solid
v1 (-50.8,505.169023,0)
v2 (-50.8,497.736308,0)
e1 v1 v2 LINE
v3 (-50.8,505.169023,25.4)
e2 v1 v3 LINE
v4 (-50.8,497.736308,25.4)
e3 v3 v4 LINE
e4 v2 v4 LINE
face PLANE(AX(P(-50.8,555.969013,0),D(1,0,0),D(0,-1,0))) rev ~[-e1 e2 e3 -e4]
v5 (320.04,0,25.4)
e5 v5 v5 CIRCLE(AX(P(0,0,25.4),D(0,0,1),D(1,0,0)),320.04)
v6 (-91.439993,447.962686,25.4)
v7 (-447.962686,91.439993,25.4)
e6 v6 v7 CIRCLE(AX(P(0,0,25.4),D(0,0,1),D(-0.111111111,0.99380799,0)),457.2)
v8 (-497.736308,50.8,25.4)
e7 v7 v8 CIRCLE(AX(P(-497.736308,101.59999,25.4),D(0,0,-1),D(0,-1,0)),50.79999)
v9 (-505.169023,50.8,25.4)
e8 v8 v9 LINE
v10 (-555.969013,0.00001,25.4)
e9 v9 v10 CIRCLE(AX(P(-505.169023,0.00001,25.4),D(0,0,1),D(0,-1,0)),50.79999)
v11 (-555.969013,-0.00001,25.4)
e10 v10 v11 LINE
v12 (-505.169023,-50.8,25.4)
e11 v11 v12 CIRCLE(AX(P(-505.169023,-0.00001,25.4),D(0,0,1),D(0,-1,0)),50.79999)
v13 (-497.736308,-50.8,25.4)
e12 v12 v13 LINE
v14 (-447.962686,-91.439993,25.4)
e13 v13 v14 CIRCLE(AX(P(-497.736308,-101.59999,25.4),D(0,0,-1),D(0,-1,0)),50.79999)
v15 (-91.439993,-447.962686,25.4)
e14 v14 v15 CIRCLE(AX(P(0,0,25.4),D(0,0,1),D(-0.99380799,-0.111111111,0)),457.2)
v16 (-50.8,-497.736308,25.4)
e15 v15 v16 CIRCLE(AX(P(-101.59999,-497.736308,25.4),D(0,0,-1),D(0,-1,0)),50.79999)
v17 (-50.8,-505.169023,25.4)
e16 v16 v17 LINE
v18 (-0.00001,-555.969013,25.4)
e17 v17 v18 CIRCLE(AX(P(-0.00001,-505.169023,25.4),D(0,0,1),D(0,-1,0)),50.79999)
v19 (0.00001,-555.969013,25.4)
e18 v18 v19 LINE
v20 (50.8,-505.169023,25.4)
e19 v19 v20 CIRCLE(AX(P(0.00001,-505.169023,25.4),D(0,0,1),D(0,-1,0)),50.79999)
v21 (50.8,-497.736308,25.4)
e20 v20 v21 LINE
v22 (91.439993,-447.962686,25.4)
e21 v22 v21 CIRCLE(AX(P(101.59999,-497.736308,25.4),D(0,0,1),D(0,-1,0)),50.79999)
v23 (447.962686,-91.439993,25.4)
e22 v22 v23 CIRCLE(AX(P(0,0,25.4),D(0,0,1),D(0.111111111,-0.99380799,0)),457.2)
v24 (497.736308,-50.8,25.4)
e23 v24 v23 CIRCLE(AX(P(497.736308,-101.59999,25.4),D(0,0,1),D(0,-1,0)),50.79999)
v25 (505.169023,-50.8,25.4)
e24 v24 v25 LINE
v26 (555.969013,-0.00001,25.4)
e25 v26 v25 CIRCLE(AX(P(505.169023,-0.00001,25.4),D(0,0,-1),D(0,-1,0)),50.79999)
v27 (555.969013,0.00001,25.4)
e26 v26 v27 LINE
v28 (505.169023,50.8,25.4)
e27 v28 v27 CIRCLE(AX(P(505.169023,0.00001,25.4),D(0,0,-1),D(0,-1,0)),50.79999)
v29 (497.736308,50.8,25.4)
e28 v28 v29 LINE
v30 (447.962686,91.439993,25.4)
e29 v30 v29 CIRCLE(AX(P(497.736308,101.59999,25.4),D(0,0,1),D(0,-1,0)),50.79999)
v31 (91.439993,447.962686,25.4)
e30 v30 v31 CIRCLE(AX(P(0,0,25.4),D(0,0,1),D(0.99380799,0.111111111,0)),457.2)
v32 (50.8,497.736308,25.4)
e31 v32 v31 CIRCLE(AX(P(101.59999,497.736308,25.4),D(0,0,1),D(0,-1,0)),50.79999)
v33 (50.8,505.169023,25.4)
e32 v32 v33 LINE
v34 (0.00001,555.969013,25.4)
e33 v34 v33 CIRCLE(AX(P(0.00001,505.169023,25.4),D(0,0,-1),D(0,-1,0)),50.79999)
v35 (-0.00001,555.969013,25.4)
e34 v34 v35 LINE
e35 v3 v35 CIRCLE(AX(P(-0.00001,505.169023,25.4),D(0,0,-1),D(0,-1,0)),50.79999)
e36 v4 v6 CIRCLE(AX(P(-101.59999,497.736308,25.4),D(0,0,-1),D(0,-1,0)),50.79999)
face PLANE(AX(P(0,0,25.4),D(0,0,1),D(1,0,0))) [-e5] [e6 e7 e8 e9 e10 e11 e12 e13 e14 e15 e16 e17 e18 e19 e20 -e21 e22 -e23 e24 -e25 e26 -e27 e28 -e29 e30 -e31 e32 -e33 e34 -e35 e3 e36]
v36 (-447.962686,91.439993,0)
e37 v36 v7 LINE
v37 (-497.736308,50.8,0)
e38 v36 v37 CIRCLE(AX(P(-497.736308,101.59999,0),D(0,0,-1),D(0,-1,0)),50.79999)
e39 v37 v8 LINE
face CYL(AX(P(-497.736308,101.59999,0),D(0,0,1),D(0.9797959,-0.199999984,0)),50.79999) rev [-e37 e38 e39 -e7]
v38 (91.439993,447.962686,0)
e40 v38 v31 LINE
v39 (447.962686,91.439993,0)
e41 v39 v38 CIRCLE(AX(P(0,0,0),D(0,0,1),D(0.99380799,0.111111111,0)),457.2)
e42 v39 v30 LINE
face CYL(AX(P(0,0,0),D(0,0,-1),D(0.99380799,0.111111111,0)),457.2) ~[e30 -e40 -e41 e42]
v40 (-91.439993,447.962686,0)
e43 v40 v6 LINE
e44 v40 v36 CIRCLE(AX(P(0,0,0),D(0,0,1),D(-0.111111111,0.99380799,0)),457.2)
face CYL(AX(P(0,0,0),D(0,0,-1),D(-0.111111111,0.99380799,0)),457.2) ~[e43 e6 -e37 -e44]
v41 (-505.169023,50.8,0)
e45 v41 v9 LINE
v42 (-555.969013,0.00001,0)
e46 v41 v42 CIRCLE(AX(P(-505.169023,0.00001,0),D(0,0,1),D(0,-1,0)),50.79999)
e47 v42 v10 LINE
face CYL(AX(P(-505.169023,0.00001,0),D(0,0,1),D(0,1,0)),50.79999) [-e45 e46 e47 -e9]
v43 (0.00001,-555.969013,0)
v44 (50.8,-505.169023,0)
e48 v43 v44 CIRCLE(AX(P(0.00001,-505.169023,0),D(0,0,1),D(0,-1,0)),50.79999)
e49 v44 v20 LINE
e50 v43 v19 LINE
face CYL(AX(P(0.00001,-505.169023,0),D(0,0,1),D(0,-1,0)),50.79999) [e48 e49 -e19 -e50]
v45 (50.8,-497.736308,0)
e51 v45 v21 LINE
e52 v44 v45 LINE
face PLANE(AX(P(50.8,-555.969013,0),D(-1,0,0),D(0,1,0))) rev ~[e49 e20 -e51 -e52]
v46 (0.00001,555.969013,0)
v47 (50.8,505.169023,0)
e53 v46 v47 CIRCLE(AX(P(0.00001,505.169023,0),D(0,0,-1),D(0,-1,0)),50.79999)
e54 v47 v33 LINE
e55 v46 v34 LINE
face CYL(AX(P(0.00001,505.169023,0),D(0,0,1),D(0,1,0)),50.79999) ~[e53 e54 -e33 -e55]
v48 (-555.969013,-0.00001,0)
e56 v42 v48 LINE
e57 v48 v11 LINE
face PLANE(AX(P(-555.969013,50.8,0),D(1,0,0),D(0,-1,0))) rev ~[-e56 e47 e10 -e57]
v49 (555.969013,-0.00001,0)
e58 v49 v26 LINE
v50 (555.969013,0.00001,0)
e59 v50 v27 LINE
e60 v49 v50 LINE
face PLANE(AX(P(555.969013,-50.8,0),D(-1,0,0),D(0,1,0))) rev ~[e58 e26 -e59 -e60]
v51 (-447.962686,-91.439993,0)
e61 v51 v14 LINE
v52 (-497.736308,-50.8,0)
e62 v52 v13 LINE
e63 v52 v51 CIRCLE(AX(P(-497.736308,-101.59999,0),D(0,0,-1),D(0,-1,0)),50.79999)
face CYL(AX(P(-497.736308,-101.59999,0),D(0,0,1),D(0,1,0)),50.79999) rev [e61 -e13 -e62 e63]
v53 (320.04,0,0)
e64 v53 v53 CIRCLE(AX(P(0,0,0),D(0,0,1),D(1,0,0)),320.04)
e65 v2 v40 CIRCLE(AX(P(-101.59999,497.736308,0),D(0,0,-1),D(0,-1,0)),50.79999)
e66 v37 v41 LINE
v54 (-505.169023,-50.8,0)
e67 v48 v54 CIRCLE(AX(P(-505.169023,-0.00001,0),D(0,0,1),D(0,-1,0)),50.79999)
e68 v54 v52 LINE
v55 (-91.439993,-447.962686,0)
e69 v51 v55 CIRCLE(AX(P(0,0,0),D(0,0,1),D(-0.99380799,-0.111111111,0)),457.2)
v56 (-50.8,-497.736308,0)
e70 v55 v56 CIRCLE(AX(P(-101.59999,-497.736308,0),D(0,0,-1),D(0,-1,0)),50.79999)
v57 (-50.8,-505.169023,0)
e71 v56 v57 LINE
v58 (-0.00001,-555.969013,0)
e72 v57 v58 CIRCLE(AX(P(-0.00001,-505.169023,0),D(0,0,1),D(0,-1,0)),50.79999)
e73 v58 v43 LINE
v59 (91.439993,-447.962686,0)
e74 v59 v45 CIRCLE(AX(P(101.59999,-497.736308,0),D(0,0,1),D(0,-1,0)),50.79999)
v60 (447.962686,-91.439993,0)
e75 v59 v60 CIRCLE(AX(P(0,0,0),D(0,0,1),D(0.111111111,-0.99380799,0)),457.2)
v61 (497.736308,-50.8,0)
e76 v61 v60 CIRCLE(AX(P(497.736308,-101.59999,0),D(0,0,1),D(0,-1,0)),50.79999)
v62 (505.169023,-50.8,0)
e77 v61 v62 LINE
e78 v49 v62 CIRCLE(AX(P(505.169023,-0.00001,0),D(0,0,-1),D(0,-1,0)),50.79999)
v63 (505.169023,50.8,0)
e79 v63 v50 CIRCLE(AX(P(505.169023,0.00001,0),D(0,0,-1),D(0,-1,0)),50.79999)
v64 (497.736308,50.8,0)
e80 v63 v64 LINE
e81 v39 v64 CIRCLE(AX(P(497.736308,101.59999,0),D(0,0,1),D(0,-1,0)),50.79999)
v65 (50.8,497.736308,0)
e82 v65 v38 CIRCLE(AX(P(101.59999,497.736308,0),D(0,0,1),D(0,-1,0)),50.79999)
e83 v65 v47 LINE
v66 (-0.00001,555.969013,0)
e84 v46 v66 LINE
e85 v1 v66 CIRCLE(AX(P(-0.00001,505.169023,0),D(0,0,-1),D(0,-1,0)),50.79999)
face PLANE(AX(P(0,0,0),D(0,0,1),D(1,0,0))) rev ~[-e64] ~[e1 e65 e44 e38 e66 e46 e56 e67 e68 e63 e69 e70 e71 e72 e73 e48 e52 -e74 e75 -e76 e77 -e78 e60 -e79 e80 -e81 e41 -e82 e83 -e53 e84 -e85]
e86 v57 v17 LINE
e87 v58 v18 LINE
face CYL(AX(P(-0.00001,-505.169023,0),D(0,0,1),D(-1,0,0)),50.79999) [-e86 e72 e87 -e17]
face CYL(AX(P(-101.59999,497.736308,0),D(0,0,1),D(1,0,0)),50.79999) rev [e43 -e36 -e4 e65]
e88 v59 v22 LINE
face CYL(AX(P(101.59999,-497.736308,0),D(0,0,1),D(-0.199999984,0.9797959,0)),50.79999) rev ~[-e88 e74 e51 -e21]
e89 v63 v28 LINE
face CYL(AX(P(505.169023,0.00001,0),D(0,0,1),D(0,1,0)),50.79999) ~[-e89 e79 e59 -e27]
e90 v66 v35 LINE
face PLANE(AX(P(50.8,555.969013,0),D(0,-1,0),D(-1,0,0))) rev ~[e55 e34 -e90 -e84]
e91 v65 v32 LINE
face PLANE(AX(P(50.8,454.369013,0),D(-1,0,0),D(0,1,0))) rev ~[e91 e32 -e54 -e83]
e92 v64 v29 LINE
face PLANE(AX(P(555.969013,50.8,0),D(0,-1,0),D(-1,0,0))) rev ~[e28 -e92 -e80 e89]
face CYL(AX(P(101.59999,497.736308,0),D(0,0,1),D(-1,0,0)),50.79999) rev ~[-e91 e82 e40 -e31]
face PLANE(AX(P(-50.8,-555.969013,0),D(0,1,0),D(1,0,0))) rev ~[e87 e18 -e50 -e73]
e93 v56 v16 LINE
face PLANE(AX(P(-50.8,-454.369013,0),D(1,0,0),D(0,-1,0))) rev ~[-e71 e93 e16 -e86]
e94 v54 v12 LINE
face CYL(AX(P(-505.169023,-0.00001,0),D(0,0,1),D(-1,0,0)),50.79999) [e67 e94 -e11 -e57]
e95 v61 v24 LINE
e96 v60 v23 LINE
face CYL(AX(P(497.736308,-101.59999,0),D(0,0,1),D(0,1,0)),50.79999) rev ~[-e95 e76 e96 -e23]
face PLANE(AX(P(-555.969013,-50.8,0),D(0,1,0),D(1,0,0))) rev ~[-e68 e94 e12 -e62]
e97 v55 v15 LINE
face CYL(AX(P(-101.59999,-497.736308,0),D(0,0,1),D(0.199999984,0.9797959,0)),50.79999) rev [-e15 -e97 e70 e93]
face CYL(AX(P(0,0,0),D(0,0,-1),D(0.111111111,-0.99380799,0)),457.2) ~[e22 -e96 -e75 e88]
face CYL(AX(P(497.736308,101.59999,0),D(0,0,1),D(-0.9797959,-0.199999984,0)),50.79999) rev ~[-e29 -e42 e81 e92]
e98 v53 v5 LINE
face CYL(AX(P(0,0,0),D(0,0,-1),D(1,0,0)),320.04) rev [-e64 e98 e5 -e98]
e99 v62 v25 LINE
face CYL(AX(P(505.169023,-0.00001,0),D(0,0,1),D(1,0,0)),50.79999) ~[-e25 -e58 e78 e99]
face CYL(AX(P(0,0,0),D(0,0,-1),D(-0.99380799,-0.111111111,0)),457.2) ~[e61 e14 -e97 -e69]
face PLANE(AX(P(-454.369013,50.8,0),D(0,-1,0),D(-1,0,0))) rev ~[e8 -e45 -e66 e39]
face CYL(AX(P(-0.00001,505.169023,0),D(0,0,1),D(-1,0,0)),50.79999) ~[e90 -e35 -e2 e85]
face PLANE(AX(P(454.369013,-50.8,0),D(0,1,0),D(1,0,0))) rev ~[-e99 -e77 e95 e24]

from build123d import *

# Parameters (mm, degrees)
F0_R     = 320.04
F1_DEPTH = 25.4
F2_R     = 50.79999


# Not quite as in the source:
# - a fillet or chamfer is up to 0.001 mm smaller than in the source, because OpenCascade refuses the exact size


with BuildPart() as f1:
    # F0 (on Top) → F1 (new body)
    with BuildSketch(Plane.XY):
        with BuildLine():
            Line((-50.8, 555.969013028), (-50.8, 454.369013028))
            ThreePointArc((-50.8, 454.369013028), (-323.2892203585, 323.2892203585), (-454.369013028, 50.8))
            Line((-454.369013028, 50.8), (-555.969013028, 50.8))
            Line((-555.969013028, 50.8), (-555.969013028, -50.8))
            Line((-555.969013028, -50.8), (-454.369013028, -50.8))
            ThreePointArc((-454.369013028, -50.8), (-323.2892203585, -323.2892203585), (-50.8, -454.369013028))
            Line((-50.8, -454.369013028), (-50.8, -555.969013028))
            Line((-50.8, -555.969013028), (50.8, -555.969013028))
            Line((50.8, -555.969013028), (50.8, -454.369013028))
            ThreePointArc((50.8, -454.369013028), (323.2892203585, -323.2892203585), (454.369013028, -50.8))
            Line((454.369013028, -50.8), (555.969013028, -50.8))
            Line((555.969013028, -50.8), (555.969013028, 50.8))
            Line((555.969013028, 50.8), (454.369013028, 50.8))
            ThreePointArc((454.369013028, 50.8), (323.2892203585, 323.2892203585), (50.8, 454.369013028))
            Line((50.8, 454.369013028), (50.8, 555.969013028))
            Line((50.8, 555.969013028), (-50.8, 555.969013028))
        make_face()
        Circle(F0_R, mode=Mode.SUBTRACT)
    extrude(amount=F1_DEPTH)

    # F2 (radius 50.8 in the source; OpenCascade refuses exactly that, so slightly less here)
    f2_edges = [f1.edges().sort_by_distance(p)[0] for p in [
        (50.8, -555.969013, 12.7),
        (-50.8, -555.969013, 12.7),
        (555.969013, -50.8, 12.7),
        (555.969013, 50.8, 12.7),
        (50.8, 555.969013, 12.7),
        (-50.8, 555.969013, 12.7),
        (-555.969013, 50.8, 12.7),
        (-555.969013, -50.8, 12.7),
        (50.8, -454.369013, 12.7),
        (454.369013, -50.8, 12.7),
        (454.369013, 50.8, 12.7),
        (50.8, 454.369013, 12.7),
        (-50.8, 454.369013, 12.7),
        (-454.369013, 50.8, 12.7),
        (-454.369013, -50.8, 12.7),
        (-50.8, -454.369013, 12.7),
    ]]
    fillet(f2_edges, radius=F2_R)


solid = f1.part
